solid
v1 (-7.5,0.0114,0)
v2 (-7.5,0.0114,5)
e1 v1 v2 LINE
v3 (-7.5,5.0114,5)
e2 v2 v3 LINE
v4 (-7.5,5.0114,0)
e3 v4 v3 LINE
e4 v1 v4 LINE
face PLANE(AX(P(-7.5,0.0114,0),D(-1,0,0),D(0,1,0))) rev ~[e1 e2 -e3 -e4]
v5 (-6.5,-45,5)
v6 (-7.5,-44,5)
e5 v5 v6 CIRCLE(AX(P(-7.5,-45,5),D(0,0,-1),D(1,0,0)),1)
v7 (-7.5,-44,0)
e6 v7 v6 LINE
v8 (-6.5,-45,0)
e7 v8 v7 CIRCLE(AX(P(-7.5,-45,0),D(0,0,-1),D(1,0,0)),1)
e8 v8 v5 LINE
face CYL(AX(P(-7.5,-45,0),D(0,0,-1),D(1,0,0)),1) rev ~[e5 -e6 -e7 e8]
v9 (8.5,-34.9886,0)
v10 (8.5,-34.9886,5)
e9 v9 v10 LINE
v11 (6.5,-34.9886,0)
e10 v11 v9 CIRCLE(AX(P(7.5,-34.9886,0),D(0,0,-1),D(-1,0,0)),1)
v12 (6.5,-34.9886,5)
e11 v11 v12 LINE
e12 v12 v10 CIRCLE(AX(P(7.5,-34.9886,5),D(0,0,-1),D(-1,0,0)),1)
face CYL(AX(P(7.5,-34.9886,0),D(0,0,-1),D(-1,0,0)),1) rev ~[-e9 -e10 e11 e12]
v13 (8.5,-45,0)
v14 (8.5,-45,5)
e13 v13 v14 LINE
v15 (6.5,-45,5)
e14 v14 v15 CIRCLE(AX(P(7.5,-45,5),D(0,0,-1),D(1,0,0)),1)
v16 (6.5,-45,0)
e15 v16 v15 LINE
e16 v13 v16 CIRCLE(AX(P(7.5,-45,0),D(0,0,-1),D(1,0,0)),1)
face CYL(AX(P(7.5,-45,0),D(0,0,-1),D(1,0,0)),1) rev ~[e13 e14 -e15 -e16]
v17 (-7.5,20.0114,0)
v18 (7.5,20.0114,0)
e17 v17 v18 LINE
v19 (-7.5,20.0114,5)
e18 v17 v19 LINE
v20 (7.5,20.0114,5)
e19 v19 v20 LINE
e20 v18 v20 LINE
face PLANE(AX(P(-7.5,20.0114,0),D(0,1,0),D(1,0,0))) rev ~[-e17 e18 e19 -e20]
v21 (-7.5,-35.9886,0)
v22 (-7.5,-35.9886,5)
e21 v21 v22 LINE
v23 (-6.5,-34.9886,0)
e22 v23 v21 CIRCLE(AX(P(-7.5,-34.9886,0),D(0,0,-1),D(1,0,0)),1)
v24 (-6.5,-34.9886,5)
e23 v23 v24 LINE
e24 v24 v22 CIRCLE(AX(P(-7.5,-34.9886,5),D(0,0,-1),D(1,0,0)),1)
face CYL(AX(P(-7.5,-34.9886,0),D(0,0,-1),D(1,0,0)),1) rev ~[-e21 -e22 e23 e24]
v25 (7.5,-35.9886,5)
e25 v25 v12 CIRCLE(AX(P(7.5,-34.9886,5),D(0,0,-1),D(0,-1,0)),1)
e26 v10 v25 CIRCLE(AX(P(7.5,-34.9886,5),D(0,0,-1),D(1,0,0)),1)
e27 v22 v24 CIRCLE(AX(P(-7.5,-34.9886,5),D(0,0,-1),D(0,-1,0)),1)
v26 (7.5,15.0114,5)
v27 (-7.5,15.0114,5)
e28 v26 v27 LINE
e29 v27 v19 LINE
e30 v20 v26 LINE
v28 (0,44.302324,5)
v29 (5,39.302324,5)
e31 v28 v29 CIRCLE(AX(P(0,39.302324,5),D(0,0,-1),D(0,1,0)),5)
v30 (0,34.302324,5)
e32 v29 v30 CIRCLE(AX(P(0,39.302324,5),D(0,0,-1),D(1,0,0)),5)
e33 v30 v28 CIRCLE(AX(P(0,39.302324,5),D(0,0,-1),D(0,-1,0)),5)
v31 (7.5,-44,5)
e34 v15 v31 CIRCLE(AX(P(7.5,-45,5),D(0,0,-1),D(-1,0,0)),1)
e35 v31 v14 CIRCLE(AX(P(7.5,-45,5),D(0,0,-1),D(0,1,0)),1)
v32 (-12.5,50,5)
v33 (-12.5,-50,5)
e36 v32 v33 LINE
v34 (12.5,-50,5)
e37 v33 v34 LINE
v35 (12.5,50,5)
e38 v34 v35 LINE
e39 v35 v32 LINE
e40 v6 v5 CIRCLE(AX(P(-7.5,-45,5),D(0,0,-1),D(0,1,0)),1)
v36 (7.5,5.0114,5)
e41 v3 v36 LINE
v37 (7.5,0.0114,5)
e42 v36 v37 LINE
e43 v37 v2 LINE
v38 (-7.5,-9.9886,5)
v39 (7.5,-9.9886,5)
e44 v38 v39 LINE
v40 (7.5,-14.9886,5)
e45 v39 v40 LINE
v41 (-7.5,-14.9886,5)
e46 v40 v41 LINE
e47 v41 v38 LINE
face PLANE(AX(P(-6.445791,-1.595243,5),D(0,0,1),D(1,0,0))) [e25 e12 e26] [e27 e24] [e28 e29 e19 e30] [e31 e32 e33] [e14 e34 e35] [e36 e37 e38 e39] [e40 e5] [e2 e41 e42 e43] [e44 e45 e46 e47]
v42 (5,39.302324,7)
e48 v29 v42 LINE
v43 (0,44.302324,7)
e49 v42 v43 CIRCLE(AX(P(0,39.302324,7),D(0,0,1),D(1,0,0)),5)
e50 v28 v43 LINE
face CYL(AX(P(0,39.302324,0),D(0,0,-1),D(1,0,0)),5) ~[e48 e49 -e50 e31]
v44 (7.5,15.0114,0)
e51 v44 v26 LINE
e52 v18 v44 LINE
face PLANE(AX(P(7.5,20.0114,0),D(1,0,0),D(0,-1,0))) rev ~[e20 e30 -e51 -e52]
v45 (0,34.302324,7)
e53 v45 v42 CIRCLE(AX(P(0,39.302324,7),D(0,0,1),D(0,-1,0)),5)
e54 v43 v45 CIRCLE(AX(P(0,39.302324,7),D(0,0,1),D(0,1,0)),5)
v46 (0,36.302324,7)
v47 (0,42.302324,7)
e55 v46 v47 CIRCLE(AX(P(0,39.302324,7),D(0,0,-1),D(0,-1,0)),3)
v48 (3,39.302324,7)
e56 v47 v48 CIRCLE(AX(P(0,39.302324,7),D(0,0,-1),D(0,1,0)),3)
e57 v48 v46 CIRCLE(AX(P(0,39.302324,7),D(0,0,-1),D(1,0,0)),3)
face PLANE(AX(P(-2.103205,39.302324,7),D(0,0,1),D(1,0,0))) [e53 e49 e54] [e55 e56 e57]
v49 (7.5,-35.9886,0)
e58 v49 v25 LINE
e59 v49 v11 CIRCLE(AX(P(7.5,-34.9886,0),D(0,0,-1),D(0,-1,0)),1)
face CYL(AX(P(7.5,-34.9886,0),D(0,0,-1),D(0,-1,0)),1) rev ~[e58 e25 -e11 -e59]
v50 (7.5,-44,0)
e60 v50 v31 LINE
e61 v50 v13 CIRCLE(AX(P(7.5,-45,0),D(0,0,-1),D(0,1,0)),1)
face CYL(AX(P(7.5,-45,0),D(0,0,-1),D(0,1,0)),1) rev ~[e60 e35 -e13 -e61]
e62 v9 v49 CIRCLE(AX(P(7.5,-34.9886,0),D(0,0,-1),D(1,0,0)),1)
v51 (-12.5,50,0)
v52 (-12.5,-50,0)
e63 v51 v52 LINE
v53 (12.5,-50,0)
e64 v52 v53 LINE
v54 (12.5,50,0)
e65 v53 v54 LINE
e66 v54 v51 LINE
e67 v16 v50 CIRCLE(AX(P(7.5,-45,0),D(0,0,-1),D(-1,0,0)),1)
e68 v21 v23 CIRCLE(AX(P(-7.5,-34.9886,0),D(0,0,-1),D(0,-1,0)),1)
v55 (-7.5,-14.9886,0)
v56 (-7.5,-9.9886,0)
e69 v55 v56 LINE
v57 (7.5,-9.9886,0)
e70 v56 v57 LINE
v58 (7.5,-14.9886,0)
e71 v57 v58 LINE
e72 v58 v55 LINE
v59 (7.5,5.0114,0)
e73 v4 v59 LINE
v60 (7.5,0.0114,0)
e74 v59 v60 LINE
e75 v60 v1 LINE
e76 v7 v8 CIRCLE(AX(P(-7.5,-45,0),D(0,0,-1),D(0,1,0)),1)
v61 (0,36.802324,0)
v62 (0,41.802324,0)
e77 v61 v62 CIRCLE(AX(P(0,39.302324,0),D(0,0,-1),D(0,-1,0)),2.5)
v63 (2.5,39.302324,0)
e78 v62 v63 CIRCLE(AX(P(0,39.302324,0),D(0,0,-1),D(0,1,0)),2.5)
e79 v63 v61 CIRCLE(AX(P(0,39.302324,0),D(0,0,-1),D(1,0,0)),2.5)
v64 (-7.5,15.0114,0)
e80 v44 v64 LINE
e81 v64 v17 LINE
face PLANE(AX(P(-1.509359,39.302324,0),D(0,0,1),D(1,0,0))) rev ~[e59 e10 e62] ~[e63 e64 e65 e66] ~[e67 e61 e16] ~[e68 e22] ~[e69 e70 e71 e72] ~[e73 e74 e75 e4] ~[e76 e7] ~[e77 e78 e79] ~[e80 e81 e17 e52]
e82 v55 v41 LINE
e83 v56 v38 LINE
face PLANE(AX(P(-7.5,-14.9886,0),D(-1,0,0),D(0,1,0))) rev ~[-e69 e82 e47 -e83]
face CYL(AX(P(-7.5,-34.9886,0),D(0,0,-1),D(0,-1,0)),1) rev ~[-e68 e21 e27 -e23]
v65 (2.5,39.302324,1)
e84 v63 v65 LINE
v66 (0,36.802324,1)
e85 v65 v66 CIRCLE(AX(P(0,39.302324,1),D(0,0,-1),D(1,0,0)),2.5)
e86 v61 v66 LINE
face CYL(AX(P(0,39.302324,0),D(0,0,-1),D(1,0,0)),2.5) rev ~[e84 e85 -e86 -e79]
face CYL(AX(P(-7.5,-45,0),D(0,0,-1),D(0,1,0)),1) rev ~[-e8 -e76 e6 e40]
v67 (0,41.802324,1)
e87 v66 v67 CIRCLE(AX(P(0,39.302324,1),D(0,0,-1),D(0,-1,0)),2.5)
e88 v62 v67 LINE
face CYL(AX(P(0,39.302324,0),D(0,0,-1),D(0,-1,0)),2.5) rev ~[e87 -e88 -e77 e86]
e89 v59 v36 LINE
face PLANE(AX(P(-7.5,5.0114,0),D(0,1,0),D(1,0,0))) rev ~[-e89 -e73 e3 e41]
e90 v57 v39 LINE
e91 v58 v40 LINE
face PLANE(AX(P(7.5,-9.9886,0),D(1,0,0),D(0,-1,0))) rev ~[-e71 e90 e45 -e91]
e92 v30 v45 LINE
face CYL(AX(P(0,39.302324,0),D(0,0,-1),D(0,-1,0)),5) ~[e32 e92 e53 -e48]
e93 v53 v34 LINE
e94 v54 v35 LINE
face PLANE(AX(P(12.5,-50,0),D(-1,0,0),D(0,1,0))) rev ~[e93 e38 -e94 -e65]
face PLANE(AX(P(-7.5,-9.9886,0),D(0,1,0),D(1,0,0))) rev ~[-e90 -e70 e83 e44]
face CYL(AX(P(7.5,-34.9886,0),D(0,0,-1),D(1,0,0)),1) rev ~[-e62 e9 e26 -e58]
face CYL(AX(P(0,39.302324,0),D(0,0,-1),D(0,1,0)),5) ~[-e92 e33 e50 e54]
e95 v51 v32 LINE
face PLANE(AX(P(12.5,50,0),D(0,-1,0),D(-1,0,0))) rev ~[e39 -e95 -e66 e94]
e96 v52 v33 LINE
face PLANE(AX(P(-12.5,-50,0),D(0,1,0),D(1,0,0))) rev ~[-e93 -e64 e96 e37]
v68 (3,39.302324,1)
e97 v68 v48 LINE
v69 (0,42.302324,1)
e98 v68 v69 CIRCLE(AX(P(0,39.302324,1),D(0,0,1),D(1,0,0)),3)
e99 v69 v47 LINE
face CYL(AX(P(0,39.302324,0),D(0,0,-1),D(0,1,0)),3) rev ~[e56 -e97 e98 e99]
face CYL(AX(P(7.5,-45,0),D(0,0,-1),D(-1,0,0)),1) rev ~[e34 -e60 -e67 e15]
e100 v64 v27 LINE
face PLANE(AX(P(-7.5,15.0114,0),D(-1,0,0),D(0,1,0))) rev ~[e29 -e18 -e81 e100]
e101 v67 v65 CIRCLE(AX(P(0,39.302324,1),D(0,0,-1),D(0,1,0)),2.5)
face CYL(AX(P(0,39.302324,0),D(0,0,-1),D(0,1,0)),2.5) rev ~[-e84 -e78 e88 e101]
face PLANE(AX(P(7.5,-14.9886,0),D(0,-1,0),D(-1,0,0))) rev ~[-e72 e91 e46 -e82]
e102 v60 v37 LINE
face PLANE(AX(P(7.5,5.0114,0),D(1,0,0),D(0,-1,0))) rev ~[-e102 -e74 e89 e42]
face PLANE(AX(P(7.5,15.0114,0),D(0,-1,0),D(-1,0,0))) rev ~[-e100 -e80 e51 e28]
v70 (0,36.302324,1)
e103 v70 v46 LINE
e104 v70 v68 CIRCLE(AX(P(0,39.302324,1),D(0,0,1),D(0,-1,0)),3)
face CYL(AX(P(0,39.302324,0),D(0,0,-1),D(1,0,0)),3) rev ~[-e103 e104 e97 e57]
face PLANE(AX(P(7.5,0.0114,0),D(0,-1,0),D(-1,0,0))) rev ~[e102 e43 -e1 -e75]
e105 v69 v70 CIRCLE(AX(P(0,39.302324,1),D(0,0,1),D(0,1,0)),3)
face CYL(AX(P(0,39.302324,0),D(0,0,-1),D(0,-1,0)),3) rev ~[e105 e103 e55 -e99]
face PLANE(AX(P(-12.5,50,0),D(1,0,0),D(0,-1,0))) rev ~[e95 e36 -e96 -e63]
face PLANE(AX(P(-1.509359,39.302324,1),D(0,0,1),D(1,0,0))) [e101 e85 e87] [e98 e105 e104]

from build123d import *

# Parameters (mm, degrees)
F1_DEPTH = 5
F2_DEPTH = 7
F3_DEPTH = 1


with BuildPart() as f1:
    # F0 (on Top) → F1 (new body)
    with BuildSketch(Plane.XY):
        with BuildLine():
            Line((-12.5, -50), (0, -50))
            Line((0, -50), (0, -45))
            Line((0, -45), (-6.5, -45))
            ThreePointArc((-6.5, -45), (-8.2071067812, -45.7071067812), (-7.5, -44))
            Line((-7.5, -44), (-7.5, -35.9886))
            ThreePointArc((-7.5, -35.9886), (-8.2071067812, -34.2814932188), (-6.5, -34.9886))
            Line((-6.5, -34.9886), (0, -34.9886))
            Line((0, -34.9886), (0, -14.9886))
            Line((0, -14.9886), (-7.5, -14.9886))
            Line((-7.5, -14.9886), (-7.5, -9.9886))
            Line((-7.5, -9.9886), (0, -9.9886))
            Line((0, -9.9886), (0, 0.0114))
            Line((0, 0.0114), (-7.5, 0.0114))
            Line((-7.5, 0.0114), (-7.5, 5.0114))
            Line((-7.5, 5.0114), (0, 5.0114))
            Line((0, 5.0114), (0, 15.0114))
            Line((0, 15.0114), (-7.5, 15.0114))
            Line((-7.5, 15.0114), (-7.5, 20.0114))
            Line((-7.5, 20.0114), (0, 20.0114))
            Line((0, 20.0114), (0, 34.3023235092))
            ThreePointArc((0, 34.3023235092), (-5, 39.3023235092), (0, 44.3023235092))
            Line((0, 44.3023235092), (0, 50))
            Line((0, 50), (-12.5, 50))
            Line((-12.5, 50), (-12.5, -50))
        make_face()
        with BuildLine():
            Line((0, -50), (12.5, -50))
            Line((12.5, -50), (12.5, 50))
            Line((12.5, 50), (0, 50))
            Line((0, 50), (0, 44.3023235092))
            ThreePointArc((0, 44.3023235092), (3.5355339059, 42.8378574152), (5, 39.3023235092))
            ThreePointArc((5, 39.3023235092), (3.5355339059, 35.7667896033), (0, 34.3023235092))
            Line((0, 34.3023235092), (0, 20.0114))
            Line((0, 20.0114), (7.5, 20.0114))
            Line((7.5, 20.0114), (7.5, 15.0114))
            Line((7.5, 15.0114), (0, 15.0114))
            Line((0, 15.0114), (0, 5.0114))
            Line((0, 5.0114), (7.5, 5.0114))
            Line((7.5, 5.0114), (7.5, 0.0114))
            Line((7.5, 0.0114), (0, 0.0114))
            Line((0, 0.0114), (0, -9.9886))
            Line((0, -9.9886), (7.5, -9.9886))
            Line((7.5, -9.9886), (7.5, -14.9886))
            Line((7.5, -14.9886), (0, -14.9886))
            Line((0, -14.9886), (0, -34.9886))
            Line((0, -34.9886), (6.5, -34.9886))
            ThreePointArc((6.5, -34.9886), (7.5, -33.9886), (8.5, -34.9886))
            ThreePointArc((8.5, -34.9886), (8.2071067812, -35.6957067812), (7.5, -35.9886))
            Line((7.5, -35.9886), (7.5, -44))
            ThreePointArc((7.5, -44), (8.2071067812, -44.2928932188), (8.5, -45))
            ThreePointArc((8.5, -45), (7.5, -46), (6.5, -45))
            Line((6.5, -45), (0, -45))
            Line((0, -45), (0, -50))
        make_face()
        with BuildLine():
            Line((0, -34.9886), (0, -45))
            Line((0, -45), (6.5, -45))
            ThreePointArc((6.5, -45), (6.7928932188, -44.2928932188), (7.5, -44))
            Line((7.5, -44), (7.5, -35.9886))
            ThreePointArc((7.5, -35.9886), (6.7928932188, -35.6957067812), (6.5, -34.9886))
            Line((6.5, -34.9886), (0, -34.9886))
        make_face()
        with BuildLine():
            Line((-6.5, -45), (0, -45))
            Line((0, -45), (0, -34.9886))
            Line((0, -34.9886), (-6.5, -34.9886))
            ThreePointArc((-6.5, -34.9886), (-6.7928932188, -35.6957067812), (-7.5, -35.9886))
            Line((-7.5, -35.9886), (-7.5, -44))
            ThreePointArc((-7.5, -44), (-6.7928932188, -44.2928932188), (-6.5, -45))
        make_face()
    extrude(amount=F1_DEPTH)

    # F0 (on Top) → F2 (join)
    with BuildSketch(Plane.XY):
        with BuildLine():
            Line((0, 42.3023235092), (0, 44.3023235092))
            ThreePointArc((0, 44.3023235092), (-5, 39.3023235092), (0, 34.3023235092))
            Line((0, 34.3023235092), (0, 36.3023235092))
            ThreePointArc((0, 36.3023235092), (-3, 39.3023235092), (0, 42.3023235092))
        make_face()
        with BuildLine():
            ThreePointArc((5, 39.3023235092), (3.5355339059, 42.8378574152), (0, 44.3023235092))
            Line((0, 44.3023235092), (0, 42.3023235092))
            ThreePointArc((0, 42.3023235092), (2.1213203436, 41.4236438528), (3, 39.3023235092))
            ThreePointArc((3, 39.3023235092), (2.1213203436, 37.1810031657), (0, 36.3023235092))
            Line((0, 36.3023235092), (0, 34.3023235092))
            ThreePointArc((0, 34.3023235092), (3.5355339059, 35.7667896033), (5, 39.3023235092))
        make_face()
    extrude(amount=F2_DEPTH)

    # F0 (on Top) → F3 (join)
    with BuildSketch(Plane.XY):
        with BuildLine():
            Line((0, 41.8023235092), (0, 42.3023235092))
            ThreePointArc((0, 42.3023235092), (-3, 39.3023235092), (0, 36.3023235092))
            Line((0, 36.3023235092), (0, 36.8023235092))
            ThreePointArc((0, 36.8023235092), (-2.5, 39.3023235092), (0, 41.8023235092))
        make_face()
        with BuildLine():
            ThreePointArc((3, 39.3023235092), (2.1213203436, 41.4236438528), (0, 42.3023235092))
            Line((0, 42.3023235092), (0, 41.8023235092))
            ThreePointArc((0, 41.8023235092), (1.767766953, 41.0700904622), (2.5, 39.3023235092))
            ThreePointArc((2.5, 39.3023235092), (1.767766953, 37.5345565563), (0, 36.8023235092))
            Line((0, 36.8023235092), (0, 36.3023235092))
            ThreePointArc((0, 36.3023235092), (2.1213203436, 37.1810031657), (3, 39.3023235092))
        make_face()
    extrude(amount=F3_DEPTH)


solid = f1.part
